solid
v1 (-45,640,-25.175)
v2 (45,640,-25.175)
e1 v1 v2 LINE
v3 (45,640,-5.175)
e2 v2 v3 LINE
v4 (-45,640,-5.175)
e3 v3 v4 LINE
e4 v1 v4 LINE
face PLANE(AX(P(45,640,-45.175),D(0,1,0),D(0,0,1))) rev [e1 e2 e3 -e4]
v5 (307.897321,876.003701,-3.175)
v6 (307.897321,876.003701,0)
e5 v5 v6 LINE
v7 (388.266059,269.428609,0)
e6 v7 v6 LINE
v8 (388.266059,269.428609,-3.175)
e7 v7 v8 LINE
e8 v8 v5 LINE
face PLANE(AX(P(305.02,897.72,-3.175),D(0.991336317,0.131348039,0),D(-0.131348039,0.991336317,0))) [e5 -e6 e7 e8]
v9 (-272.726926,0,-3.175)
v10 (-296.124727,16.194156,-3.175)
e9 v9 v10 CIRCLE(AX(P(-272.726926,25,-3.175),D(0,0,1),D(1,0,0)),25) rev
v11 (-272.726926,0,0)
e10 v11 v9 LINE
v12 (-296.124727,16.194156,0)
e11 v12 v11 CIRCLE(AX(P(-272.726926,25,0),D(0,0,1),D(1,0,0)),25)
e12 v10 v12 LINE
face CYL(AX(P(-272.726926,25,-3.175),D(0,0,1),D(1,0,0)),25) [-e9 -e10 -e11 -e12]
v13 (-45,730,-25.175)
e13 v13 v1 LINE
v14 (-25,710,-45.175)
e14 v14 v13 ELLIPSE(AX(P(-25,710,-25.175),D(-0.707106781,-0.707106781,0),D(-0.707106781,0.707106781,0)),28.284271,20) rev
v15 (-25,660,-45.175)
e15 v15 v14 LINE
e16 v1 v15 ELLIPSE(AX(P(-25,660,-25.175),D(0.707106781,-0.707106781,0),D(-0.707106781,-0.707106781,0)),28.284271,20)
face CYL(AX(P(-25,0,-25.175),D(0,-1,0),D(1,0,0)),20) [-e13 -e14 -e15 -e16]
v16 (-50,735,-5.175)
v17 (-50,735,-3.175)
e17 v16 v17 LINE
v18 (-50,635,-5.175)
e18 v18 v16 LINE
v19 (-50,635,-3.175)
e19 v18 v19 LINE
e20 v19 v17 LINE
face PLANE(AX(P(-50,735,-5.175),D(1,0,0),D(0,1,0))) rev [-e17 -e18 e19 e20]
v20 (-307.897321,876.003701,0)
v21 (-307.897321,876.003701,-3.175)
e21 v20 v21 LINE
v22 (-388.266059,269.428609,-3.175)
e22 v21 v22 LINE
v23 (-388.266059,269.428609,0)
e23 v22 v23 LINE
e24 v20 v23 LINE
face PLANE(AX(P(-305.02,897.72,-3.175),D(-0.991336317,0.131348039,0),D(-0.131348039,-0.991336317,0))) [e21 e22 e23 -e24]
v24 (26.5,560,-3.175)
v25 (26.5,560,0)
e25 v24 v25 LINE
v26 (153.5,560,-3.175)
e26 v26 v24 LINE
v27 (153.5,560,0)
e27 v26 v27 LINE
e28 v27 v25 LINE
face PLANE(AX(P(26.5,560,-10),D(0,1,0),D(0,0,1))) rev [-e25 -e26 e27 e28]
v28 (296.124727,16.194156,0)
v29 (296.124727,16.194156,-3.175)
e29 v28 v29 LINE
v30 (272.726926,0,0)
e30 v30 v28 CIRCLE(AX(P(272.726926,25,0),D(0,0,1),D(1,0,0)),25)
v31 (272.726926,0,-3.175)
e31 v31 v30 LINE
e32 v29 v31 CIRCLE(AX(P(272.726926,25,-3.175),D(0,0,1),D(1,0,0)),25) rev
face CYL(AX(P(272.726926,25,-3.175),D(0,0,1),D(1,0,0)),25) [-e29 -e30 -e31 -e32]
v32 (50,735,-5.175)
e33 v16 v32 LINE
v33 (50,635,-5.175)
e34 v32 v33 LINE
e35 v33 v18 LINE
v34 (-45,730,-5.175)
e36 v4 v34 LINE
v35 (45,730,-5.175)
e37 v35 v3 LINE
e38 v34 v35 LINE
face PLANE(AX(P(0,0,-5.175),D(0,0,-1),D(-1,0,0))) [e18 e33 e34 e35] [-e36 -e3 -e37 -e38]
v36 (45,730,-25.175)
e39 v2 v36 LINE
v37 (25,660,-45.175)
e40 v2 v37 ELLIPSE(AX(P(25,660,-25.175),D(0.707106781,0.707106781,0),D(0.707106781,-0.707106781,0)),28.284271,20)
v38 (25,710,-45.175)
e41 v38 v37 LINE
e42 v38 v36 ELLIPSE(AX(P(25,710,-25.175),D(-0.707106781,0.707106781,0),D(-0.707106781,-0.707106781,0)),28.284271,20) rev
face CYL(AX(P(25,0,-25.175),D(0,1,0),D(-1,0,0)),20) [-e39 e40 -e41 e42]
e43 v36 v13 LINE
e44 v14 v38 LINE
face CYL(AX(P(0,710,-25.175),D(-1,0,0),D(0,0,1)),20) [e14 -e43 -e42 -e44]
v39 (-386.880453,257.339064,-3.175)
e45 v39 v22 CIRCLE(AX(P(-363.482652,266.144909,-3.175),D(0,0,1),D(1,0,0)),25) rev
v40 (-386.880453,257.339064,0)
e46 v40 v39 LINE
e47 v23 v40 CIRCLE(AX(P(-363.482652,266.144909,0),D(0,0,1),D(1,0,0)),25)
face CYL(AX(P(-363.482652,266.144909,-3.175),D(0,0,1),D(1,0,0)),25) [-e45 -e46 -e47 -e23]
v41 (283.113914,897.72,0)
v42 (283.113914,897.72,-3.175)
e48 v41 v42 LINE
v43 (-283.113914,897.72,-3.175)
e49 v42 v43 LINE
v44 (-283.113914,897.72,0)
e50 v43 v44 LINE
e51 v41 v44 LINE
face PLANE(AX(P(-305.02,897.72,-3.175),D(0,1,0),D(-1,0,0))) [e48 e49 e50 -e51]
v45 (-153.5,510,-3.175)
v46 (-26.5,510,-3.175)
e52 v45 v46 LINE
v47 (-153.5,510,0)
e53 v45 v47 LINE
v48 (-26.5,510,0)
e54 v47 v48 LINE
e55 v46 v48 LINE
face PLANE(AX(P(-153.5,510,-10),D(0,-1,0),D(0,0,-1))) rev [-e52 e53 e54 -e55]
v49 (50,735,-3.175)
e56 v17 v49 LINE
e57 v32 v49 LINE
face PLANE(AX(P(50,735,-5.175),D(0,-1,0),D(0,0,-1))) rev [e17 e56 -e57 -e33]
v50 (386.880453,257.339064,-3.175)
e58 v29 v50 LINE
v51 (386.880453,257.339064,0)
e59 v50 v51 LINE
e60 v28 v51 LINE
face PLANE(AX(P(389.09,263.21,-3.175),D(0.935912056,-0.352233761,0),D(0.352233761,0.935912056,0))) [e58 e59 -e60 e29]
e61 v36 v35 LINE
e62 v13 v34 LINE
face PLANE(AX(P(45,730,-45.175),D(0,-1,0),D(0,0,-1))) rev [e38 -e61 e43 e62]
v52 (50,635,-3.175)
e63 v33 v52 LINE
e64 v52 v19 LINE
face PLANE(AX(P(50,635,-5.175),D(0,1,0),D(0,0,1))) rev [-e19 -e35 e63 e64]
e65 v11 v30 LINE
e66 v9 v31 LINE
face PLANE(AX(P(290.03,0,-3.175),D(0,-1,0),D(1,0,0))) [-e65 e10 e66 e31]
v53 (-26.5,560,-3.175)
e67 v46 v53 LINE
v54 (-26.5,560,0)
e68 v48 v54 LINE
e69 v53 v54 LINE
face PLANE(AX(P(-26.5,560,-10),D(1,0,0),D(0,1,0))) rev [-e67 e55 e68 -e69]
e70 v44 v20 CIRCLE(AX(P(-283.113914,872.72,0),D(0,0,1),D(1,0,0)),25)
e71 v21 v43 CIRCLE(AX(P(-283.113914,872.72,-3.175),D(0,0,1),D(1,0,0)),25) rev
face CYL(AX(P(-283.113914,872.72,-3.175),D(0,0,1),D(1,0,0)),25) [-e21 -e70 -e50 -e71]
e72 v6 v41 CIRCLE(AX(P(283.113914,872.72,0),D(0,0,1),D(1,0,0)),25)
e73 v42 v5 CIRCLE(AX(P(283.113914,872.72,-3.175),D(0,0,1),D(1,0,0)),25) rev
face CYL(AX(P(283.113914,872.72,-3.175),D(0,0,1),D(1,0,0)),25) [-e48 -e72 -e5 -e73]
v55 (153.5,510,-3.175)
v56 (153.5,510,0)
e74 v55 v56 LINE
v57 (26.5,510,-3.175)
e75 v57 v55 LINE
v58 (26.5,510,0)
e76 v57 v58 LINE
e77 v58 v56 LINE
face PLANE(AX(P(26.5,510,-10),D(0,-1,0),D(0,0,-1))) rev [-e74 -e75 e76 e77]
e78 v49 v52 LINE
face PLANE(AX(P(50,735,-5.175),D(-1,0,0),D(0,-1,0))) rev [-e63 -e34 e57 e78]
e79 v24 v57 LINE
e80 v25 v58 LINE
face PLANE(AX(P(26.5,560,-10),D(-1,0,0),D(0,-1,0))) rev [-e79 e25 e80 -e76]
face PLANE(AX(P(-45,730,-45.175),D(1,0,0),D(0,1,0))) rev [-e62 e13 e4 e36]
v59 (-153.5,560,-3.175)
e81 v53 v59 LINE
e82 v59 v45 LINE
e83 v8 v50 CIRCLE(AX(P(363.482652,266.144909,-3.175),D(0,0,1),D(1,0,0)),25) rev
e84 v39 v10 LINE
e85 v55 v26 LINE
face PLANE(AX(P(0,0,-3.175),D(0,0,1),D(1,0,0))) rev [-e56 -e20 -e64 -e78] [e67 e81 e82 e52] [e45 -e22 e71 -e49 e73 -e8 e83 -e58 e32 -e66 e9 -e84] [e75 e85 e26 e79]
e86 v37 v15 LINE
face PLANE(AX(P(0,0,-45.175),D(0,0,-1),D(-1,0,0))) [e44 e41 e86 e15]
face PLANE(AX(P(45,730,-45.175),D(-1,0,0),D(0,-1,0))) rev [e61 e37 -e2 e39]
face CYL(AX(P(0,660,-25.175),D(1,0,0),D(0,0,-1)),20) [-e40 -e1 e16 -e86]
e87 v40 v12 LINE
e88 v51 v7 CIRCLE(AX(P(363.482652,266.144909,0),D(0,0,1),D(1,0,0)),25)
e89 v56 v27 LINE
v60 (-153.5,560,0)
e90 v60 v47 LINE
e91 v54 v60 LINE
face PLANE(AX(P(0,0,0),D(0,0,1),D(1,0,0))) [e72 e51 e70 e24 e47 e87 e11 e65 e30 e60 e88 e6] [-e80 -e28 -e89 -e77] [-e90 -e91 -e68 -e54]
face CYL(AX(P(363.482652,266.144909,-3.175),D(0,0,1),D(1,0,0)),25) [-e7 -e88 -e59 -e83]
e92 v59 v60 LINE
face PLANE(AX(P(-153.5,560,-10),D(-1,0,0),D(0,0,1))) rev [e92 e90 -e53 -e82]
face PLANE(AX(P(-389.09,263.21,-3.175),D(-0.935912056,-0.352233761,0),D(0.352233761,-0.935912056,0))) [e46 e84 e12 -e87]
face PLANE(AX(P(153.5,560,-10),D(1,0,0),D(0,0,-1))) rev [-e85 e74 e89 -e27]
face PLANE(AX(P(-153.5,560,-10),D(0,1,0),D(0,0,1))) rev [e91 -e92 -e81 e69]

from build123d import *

# Parameters (mm, degrees)
BASE_FLANGE1_DEPTH  = 3.175
FILLET1_R           = 25
SKETCH2_W           = 127
SKETCH2_H           = 50
CUT_EXTRUDE1_DEPTH  = 10
SKETCH3_W           = 100
SKETCH3_H           = 100
BOSS_EXTRUDE1_DEPTH = 2
SKETCH4_W           = 90
SKETCH4_H           = 90
BOSS_EXTRUDE2_DEPTH = 40
FILLET3_R           = 20


# Sheet-metal steps are written as plain solids
with BuildPart() as part:
    # Sketch1 → Base-Flange1 (new body)
    with BuildSketch(Plane.XY):
        Polygon((-305.02, 897.72), (-389.09, 263.21), (-290.03, 0), (290.03, 0), (389.09, 263.21), (305.02, 897.72), align=None)
    extrude(amount=-BASE_FLANGE1_DEPTH)

    # Fillet1
    fillet1_edges = [part.edges().sort_by_distance(p)[0] for p in [
        (-290.03, 0, -1.5875),
        (-389.09, 263.21, -1.5875),
        (-305.02, 897.72, -1.5875),
        (305.02, 897.72, -1.5875),
        (389.09, 263.21, -1.5875),
        (290.03, 0, -1.5875),
    ]]
    fillet(fillet1_edges, radius=FILLET1_R)

    # Sketch2 → Cut-Extrude1 (cut)
    with BuildSketch(Plane.XY):
        with Locations((-90, 535)):
            Rectangle(SKETCH2_W, SKETCH2_H)
        with Locations((90, 535)):
            Rectangle(SKETCH2_W, SKETCH2_H)
    extrude(amount=-CUT_EXTRUDE1_DEPTH, mode=Mode.SUBTRACT)

    # Sketch3 → Boss-Extrude1 (add)
    with BuildSketch(Plane(origin=(0, 0, -3.175), x_dir=(-1, 0, 0), z_dir=(0, 0, -1))):
        with Locations((0, 685)):
            Rectangle(SKETCH3_W, SKETCH3_H)
    extrude(amount=BOSS_EXTRUDE1_DEPTH)

    # Sketch4 → Boss-Extrude2 (add)
    with BuildSketch(Plane(origin=(0, 0, -5.175), x_dir=(-1, 0, 0), z_dir=(0, 0, -1))):
        with Locations((0, 685)):
            Rectangle(SKETCH4_W, SKETCH4_H)
    extrude(amount=BOSS_EXTRUDE2_DEPTH)

    # Fillet3
    fillet3_edges = [part.edges().sort_by_distance(p)[0] for p in [
        (-45, 685, -45.175),
        (0, 730, -45.175),
        (45, 685, -45.175),
        (0, 640, -45.175),
    ]]
    fillet(fillet3_edges, radius=FILLET3_R)


solid = part.part
